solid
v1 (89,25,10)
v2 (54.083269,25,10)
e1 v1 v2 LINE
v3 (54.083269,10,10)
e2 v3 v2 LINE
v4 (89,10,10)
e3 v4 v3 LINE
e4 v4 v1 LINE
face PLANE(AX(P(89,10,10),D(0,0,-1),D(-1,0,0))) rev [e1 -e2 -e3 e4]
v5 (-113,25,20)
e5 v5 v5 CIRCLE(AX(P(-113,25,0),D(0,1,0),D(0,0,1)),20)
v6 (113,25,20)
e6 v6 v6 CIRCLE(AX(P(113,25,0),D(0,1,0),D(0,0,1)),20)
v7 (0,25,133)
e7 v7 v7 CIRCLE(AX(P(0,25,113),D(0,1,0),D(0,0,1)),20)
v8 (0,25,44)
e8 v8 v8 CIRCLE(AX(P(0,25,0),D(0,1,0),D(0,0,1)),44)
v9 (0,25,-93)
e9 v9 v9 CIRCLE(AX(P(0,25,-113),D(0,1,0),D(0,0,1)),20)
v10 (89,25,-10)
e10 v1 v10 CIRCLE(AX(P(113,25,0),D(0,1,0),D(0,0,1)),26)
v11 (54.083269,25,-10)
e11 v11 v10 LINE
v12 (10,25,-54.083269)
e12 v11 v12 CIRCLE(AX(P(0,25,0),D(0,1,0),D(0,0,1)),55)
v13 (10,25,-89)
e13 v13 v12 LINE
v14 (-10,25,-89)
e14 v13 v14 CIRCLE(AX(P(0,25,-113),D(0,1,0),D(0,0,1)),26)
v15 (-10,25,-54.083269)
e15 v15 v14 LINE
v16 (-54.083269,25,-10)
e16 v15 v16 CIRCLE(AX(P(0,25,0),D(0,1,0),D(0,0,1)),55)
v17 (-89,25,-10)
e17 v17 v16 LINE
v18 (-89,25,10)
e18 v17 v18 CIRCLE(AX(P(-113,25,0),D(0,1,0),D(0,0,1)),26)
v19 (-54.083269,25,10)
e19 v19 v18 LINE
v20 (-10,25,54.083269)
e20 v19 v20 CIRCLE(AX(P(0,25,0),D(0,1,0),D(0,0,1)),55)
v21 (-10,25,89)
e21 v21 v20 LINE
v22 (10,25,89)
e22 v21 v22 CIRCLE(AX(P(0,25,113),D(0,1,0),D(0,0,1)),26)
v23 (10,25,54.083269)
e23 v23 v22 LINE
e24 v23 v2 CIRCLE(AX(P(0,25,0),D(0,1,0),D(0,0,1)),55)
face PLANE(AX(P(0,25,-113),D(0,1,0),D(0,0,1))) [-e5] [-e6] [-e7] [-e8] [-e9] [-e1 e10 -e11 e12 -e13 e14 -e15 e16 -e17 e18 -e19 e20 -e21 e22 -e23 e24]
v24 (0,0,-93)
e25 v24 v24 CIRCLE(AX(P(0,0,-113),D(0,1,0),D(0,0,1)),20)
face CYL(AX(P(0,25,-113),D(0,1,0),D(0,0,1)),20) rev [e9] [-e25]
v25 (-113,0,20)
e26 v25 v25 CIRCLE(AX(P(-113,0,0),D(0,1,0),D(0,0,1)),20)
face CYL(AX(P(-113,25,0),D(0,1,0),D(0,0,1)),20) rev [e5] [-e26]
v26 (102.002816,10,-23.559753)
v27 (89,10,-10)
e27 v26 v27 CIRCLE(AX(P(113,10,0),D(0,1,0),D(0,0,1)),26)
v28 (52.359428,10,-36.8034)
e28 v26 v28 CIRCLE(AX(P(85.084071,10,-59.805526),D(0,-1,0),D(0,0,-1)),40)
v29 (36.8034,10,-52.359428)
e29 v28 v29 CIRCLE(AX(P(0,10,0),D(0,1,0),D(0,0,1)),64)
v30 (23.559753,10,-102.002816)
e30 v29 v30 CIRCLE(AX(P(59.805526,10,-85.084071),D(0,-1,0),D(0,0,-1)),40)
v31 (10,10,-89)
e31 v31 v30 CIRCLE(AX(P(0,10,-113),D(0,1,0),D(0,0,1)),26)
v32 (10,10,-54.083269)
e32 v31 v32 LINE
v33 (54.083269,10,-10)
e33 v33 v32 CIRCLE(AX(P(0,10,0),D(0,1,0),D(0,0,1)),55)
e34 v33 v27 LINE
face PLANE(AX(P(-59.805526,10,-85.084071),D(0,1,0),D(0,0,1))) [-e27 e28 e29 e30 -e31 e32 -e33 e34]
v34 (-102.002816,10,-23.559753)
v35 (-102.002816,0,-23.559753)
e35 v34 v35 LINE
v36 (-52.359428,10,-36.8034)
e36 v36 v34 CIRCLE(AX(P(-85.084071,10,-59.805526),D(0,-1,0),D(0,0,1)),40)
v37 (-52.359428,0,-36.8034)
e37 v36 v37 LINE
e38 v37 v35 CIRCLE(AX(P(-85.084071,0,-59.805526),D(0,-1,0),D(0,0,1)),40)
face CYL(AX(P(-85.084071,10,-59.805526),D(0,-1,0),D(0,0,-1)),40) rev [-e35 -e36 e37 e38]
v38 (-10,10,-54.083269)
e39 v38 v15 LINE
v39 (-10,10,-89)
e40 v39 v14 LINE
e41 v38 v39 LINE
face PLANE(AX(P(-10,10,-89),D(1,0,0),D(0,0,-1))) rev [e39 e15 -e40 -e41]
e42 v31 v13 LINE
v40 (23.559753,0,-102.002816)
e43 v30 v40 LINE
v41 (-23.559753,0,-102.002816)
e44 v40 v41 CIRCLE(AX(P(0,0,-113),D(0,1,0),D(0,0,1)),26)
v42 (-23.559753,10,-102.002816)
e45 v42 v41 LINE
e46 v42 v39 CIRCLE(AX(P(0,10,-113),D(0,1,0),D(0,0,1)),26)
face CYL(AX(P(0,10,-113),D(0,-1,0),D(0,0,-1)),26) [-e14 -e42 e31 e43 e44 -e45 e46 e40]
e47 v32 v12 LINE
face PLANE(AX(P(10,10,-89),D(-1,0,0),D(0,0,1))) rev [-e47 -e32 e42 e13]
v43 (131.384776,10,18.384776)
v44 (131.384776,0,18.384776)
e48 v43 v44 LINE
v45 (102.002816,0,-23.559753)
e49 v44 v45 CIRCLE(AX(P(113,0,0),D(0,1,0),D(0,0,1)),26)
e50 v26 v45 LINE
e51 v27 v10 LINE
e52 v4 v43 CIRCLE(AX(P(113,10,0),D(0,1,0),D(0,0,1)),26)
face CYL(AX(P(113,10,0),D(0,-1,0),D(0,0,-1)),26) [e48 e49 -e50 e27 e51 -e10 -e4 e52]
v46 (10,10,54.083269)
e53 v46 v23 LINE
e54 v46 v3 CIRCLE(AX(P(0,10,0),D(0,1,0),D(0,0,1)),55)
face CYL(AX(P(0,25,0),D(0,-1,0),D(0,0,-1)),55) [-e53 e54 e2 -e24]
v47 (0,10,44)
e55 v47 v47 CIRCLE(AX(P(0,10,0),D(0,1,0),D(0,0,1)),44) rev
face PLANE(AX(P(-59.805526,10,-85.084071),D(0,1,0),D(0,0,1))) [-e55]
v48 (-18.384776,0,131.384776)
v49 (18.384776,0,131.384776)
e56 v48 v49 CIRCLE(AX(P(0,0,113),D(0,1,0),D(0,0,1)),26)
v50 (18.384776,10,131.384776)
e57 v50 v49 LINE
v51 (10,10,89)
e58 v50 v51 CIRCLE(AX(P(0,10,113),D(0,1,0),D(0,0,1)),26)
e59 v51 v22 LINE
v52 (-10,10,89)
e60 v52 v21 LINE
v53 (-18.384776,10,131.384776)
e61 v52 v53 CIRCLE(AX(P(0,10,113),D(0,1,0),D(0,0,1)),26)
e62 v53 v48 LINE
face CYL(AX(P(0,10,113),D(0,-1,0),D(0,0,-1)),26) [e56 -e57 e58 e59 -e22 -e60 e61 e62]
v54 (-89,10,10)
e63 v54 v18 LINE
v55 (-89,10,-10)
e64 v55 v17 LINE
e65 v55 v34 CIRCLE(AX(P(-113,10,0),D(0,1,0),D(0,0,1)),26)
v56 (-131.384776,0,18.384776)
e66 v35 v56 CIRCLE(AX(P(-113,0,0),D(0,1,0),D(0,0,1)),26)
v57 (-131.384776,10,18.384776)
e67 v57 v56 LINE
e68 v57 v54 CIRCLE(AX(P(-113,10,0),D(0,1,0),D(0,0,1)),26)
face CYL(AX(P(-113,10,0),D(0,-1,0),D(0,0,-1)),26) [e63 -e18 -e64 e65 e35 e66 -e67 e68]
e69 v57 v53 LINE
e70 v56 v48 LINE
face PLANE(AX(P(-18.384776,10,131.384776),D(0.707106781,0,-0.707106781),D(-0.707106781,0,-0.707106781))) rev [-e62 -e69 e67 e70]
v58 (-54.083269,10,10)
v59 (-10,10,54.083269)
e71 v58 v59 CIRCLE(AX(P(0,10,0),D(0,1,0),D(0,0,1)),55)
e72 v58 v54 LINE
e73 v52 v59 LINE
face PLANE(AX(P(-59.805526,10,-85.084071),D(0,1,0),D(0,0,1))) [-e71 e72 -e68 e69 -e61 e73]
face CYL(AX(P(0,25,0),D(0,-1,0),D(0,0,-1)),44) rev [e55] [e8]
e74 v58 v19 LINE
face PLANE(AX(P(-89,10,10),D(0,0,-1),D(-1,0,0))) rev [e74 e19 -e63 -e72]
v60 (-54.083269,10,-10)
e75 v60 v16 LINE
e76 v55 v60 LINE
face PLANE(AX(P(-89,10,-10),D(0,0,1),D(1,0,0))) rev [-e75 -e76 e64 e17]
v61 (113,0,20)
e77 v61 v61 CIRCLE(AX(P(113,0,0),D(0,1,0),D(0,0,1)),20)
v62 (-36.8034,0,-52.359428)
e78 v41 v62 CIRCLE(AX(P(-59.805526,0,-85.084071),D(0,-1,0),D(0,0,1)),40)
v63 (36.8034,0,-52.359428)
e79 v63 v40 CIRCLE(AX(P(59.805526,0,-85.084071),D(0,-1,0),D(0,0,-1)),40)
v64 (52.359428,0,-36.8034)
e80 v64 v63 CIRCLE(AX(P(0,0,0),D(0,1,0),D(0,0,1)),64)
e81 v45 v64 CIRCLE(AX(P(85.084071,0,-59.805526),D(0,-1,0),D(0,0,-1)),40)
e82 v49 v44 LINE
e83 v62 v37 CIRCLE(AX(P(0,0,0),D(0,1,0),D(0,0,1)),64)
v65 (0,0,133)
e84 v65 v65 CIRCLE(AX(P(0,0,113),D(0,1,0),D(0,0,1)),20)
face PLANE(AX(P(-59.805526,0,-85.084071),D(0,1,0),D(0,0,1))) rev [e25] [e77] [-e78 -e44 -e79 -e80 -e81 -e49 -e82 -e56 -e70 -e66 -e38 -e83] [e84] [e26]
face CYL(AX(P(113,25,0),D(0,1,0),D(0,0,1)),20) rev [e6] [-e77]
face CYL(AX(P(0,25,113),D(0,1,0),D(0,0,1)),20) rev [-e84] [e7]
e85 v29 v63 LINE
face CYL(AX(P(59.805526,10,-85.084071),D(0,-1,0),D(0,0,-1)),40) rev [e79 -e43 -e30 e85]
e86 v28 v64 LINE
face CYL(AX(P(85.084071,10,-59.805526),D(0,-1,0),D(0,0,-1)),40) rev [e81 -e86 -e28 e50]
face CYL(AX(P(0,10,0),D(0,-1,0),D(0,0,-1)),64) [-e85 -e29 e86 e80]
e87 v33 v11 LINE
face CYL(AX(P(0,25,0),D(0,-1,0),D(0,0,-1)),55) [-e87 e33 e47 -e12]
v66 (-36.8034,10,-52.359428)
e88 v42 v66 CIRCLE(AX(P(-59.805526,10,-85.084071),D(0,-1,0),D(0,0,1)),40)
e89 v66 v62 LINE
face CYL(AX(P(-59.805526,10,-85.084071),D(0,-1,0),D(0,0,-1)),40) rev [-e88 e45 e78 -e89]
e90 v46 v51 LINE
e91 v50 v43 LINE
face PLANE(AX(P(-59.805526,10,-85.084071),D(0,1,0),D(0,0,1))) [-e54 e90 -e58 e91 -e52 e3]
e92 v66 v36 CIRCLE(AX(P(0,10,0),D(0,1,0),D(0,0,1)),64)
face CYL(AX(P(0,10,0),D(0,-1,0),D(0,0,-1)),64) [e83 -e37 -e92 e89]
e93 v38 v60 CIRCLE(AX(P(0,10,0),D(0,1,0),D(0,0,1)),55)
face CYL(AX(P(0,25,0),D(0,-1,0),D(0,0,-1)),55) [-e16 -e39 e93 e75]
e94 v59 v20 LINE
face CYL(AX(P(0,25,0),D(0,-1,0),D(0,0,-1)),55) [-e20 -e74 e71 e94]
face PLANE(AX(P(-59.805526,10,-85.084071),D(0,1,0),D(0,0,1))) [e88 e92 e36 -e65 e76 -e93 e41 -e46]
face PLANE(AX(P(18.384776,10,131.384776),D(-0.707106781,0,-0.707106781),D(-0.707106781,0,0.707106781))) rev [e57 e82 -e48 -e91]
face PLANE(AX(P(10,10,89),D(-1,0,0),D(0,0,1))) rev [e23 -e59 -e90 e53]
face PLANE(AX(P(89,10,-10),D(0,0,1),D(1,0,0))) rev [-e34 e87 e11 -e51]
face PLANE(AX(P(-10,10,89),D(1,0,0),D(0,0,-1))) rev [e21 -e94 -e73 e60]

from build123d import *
from build123d.topology import SkipClean

# Parameters (mm, degrees)
BOSS_EXTRUDE1_DEPTH   = 10
SKETCH2_R             = 26
BOSS_EXTRUDE2_DEPTH   = 15
SKETCH3_R             = 55
SKETCH3_R_2           = 44
BOSS_EXTRUDE3_DEPTH   = 15
EXTRUDE_THIN1_START   = -15
EXTRUDE_THIN1_DEPTH   = 15
EXTRUDE_THIN2_START   = -15
EXTRUDE_THIN2_DEPTH   = 15
F_1_0MM_DOWEL_HOLE1_D = 40


# Read off the part's stored shape, not the designer's step: Extrude-Thin1, Extrude-Thin2
with BuildPart() as part:
    # Sketch1 → Boss-Extrude1 (new body)
    with BuildSketch(Plane(origin=(0, 0, 0), x_dir=(1, 0, 0), z_dir=(0, 1, 0))):
        with BuildLine():
            Line((18.384776311, -131.384776311), (131.384776311, -18.384776311))
            ThreePointArc((131.384776311, -18.384776311), (134.295069945, 14.917104144), (102.002815768, 23.559752524))
            ThreePointArc((102.002815768, 23.559752524), (74.773631801, 21.15717706), (52.359428182, 36.803400392))
            ThreePointArc((52.359428182, 36.803400392), (45.254833996, 45.254833996), (36.803400392, 52.359428182))
            ThreePointArc((36.803400392, 52.359428182), (21.15717706, 74.773631801), (23.559752524, 102.002815768))
            ThreePointArc((23.559752524, 102.002815768), (0, 139), (-23.559752524, 102.002815768))
            ThreePointArc((-23.559752524, 102.002815768), (-21.15717706, 74.773631801), (-36.803400392, 52.359428182))
            ThreePointArc((-36.803400392, 52.359428182), (-45.254833996, 45.254833996), (-52.359428182, 36.803400392))
            ThreePointArc((-52.359428182, 36.803400392), (-74.773631801, 21.15717706), (-102.002815768, 23.559752524))
            ThreePointArc((-102.002815768, 23.559752524), (-134.295069945, 14.917104144), (-131.384776311, -18.384776311))
            Line((-131.384776311, -18.384776311), (-18.384776311, -131.384776311))
            ThreePointArc((-18.384776311, -131.384776311), (0, -139), (18.384776311, -131.384776311))
        make_face()
    extrude(amount=BOSS_EXTRUDE1_DEPTH)

    # Sketch2 → Boss-Extrude2 (add)
    with BuildSketch(Plane(origin=(0, 10, 0), x_dir=(1, 0, 0), z_dir=(0, 1, 0))):
        with Locations(Location((0, 113, 0), (0, 0, 205.022151532))):
            Circle(SKETCH2_R)
        with Locations(Location((113, 0, 0), (0, 0, 115.022151532))):
            Circle(SKETCH2_R)
        with Locations(Location((-113, 0, 0), (0, 0, 64.977848468))):
            Circle(SKETCH2_R)
        with Locations(Location((0, -113, 0), (0, 0, 315))):
            Circle(SKETCH2_R)
    extrude(amount=BOSS_EXTRUDE2_DEPTH)

    # Sketch3 → Boss-Extrude3 (add)
    with BuildSketch(Plane(origin=(0, 10, 0), x_dir=(1, 0, 0), z_dir=(0, 1, 0))):
        with Locations(Location((0, 0, 0), (0, 0, 270))):
            Circle(SKETCH3_R)
        with Locations(Location((0, 0, 0), (0, 0, 270))):
            Circle(SKETCH3_R_2, mode=Mode.SUBTRACT)
    extrude(amount=BOSS_EXTRUDE3_DEPTH)

    # Extrude-Thin1 outline → Extrude-Thin1 (add)
    with SkipClean():  # the faces are left unmerged after this step: merging them gives an invalid solid
        with BuildSketch(Plane(origin=(0, 25, 0), x_dir=(1, 0, 0), z_dir=(0, 1, 0)).offset(EXTRUDE_THIN1_START)):
            with BuildLine():
                Line((-89, -10), (-54.083269132, -10))
                ThreePointArc((-54.083269132, -10), (-54.770337785, -5.02096593), (-55, 0))
                Line((-55, 0), (-87, 0))
                ThreePointArc((-87, 0), (-87.504902432, -5.099019514), (-89, -10))
            make_face()
            with BuildLine():
                ThreePointArc((10, -54.083269132), (0, -55), (-10, -54.083269132))
                Line((-10, -54.083269132), (-10, -89))
                ThreePointArc((-10, -89), (0, -87), (10, -89))
                Line((10, -89), (10, -54.083269132))
            make_face()
            with BuildLine():
                Line((87, 0), (55, 0))
                ThreePointArc((55, 0), (54.770337785, -5.02096593), (54.083269132, -10))
                Line((54.083269132, -10), (89, -10))
                ThreePointArc((89, -10), (87.504902432, -5.099019514), (87, 0))
            make_face()
        extrude(amount=EXTRUDE_THIN1_DEPTH)

    # Extrude-Thin2 outline → Extrude-Thin2 (add)
    with SkipClean():  # the faces are left unmerged after this step: merging them gives an invalid solid
        with BuildSketch(Plane(origin=(0, 25, 0), x_dir=(1, 0, 0), z_dir=(0, 1, 0)).offset(EXTRUDE_THIN2_START)):
            with BuildLine():
                Line((89, 10), (54.083269132, 10))
                ThreePointArc((54.083269132, 10), (54.770337785, 5.02096593), (55, 0))
                Line((55, 0), (87, 0))
                ThreePointArc((87, 0), (87.504902432, 5.099019514), (89, 10))
            make_face()
            with BuildLine():
                ThreePointArc((-55, 0), (-54.770337785, 5.02096593), (-54.083269132, 10))
                Line((-54.083269132, 10), (-89, 10))
                ThreePointArc((-89, 10), (-87.504902432, 5.099019514), (-87, 0))
                Line((-87, 0), (-55, 0))
            make_face()
            with BuildLine():
                Line((-10, 89), (-10, 54.083269132))
                ThreePointArc((-10, 54.083269132), (0, 55), (10, 54.083269132))
                Line((10, 54.083269132), (10, 89))
                ThreePointArc((10, 89), (0, 87), (-10, 89))
            make_face()
        extrude(amount=EXTRUDE_THIN2_DEPTH)

    # Ø1.0mm Dowel Hole1 (through all)
    with Locations(Plane(origin=(0, 25, 0), x_dir=(1, 0, 0), z_dir=(0, 1, 0))):
        with Locations((0, 113), (-113, 0), (113, 0), (0, -113)):
            Hole(F_1_0MM_DOWEL_HOLE1_D / 2)


solid = part.part
